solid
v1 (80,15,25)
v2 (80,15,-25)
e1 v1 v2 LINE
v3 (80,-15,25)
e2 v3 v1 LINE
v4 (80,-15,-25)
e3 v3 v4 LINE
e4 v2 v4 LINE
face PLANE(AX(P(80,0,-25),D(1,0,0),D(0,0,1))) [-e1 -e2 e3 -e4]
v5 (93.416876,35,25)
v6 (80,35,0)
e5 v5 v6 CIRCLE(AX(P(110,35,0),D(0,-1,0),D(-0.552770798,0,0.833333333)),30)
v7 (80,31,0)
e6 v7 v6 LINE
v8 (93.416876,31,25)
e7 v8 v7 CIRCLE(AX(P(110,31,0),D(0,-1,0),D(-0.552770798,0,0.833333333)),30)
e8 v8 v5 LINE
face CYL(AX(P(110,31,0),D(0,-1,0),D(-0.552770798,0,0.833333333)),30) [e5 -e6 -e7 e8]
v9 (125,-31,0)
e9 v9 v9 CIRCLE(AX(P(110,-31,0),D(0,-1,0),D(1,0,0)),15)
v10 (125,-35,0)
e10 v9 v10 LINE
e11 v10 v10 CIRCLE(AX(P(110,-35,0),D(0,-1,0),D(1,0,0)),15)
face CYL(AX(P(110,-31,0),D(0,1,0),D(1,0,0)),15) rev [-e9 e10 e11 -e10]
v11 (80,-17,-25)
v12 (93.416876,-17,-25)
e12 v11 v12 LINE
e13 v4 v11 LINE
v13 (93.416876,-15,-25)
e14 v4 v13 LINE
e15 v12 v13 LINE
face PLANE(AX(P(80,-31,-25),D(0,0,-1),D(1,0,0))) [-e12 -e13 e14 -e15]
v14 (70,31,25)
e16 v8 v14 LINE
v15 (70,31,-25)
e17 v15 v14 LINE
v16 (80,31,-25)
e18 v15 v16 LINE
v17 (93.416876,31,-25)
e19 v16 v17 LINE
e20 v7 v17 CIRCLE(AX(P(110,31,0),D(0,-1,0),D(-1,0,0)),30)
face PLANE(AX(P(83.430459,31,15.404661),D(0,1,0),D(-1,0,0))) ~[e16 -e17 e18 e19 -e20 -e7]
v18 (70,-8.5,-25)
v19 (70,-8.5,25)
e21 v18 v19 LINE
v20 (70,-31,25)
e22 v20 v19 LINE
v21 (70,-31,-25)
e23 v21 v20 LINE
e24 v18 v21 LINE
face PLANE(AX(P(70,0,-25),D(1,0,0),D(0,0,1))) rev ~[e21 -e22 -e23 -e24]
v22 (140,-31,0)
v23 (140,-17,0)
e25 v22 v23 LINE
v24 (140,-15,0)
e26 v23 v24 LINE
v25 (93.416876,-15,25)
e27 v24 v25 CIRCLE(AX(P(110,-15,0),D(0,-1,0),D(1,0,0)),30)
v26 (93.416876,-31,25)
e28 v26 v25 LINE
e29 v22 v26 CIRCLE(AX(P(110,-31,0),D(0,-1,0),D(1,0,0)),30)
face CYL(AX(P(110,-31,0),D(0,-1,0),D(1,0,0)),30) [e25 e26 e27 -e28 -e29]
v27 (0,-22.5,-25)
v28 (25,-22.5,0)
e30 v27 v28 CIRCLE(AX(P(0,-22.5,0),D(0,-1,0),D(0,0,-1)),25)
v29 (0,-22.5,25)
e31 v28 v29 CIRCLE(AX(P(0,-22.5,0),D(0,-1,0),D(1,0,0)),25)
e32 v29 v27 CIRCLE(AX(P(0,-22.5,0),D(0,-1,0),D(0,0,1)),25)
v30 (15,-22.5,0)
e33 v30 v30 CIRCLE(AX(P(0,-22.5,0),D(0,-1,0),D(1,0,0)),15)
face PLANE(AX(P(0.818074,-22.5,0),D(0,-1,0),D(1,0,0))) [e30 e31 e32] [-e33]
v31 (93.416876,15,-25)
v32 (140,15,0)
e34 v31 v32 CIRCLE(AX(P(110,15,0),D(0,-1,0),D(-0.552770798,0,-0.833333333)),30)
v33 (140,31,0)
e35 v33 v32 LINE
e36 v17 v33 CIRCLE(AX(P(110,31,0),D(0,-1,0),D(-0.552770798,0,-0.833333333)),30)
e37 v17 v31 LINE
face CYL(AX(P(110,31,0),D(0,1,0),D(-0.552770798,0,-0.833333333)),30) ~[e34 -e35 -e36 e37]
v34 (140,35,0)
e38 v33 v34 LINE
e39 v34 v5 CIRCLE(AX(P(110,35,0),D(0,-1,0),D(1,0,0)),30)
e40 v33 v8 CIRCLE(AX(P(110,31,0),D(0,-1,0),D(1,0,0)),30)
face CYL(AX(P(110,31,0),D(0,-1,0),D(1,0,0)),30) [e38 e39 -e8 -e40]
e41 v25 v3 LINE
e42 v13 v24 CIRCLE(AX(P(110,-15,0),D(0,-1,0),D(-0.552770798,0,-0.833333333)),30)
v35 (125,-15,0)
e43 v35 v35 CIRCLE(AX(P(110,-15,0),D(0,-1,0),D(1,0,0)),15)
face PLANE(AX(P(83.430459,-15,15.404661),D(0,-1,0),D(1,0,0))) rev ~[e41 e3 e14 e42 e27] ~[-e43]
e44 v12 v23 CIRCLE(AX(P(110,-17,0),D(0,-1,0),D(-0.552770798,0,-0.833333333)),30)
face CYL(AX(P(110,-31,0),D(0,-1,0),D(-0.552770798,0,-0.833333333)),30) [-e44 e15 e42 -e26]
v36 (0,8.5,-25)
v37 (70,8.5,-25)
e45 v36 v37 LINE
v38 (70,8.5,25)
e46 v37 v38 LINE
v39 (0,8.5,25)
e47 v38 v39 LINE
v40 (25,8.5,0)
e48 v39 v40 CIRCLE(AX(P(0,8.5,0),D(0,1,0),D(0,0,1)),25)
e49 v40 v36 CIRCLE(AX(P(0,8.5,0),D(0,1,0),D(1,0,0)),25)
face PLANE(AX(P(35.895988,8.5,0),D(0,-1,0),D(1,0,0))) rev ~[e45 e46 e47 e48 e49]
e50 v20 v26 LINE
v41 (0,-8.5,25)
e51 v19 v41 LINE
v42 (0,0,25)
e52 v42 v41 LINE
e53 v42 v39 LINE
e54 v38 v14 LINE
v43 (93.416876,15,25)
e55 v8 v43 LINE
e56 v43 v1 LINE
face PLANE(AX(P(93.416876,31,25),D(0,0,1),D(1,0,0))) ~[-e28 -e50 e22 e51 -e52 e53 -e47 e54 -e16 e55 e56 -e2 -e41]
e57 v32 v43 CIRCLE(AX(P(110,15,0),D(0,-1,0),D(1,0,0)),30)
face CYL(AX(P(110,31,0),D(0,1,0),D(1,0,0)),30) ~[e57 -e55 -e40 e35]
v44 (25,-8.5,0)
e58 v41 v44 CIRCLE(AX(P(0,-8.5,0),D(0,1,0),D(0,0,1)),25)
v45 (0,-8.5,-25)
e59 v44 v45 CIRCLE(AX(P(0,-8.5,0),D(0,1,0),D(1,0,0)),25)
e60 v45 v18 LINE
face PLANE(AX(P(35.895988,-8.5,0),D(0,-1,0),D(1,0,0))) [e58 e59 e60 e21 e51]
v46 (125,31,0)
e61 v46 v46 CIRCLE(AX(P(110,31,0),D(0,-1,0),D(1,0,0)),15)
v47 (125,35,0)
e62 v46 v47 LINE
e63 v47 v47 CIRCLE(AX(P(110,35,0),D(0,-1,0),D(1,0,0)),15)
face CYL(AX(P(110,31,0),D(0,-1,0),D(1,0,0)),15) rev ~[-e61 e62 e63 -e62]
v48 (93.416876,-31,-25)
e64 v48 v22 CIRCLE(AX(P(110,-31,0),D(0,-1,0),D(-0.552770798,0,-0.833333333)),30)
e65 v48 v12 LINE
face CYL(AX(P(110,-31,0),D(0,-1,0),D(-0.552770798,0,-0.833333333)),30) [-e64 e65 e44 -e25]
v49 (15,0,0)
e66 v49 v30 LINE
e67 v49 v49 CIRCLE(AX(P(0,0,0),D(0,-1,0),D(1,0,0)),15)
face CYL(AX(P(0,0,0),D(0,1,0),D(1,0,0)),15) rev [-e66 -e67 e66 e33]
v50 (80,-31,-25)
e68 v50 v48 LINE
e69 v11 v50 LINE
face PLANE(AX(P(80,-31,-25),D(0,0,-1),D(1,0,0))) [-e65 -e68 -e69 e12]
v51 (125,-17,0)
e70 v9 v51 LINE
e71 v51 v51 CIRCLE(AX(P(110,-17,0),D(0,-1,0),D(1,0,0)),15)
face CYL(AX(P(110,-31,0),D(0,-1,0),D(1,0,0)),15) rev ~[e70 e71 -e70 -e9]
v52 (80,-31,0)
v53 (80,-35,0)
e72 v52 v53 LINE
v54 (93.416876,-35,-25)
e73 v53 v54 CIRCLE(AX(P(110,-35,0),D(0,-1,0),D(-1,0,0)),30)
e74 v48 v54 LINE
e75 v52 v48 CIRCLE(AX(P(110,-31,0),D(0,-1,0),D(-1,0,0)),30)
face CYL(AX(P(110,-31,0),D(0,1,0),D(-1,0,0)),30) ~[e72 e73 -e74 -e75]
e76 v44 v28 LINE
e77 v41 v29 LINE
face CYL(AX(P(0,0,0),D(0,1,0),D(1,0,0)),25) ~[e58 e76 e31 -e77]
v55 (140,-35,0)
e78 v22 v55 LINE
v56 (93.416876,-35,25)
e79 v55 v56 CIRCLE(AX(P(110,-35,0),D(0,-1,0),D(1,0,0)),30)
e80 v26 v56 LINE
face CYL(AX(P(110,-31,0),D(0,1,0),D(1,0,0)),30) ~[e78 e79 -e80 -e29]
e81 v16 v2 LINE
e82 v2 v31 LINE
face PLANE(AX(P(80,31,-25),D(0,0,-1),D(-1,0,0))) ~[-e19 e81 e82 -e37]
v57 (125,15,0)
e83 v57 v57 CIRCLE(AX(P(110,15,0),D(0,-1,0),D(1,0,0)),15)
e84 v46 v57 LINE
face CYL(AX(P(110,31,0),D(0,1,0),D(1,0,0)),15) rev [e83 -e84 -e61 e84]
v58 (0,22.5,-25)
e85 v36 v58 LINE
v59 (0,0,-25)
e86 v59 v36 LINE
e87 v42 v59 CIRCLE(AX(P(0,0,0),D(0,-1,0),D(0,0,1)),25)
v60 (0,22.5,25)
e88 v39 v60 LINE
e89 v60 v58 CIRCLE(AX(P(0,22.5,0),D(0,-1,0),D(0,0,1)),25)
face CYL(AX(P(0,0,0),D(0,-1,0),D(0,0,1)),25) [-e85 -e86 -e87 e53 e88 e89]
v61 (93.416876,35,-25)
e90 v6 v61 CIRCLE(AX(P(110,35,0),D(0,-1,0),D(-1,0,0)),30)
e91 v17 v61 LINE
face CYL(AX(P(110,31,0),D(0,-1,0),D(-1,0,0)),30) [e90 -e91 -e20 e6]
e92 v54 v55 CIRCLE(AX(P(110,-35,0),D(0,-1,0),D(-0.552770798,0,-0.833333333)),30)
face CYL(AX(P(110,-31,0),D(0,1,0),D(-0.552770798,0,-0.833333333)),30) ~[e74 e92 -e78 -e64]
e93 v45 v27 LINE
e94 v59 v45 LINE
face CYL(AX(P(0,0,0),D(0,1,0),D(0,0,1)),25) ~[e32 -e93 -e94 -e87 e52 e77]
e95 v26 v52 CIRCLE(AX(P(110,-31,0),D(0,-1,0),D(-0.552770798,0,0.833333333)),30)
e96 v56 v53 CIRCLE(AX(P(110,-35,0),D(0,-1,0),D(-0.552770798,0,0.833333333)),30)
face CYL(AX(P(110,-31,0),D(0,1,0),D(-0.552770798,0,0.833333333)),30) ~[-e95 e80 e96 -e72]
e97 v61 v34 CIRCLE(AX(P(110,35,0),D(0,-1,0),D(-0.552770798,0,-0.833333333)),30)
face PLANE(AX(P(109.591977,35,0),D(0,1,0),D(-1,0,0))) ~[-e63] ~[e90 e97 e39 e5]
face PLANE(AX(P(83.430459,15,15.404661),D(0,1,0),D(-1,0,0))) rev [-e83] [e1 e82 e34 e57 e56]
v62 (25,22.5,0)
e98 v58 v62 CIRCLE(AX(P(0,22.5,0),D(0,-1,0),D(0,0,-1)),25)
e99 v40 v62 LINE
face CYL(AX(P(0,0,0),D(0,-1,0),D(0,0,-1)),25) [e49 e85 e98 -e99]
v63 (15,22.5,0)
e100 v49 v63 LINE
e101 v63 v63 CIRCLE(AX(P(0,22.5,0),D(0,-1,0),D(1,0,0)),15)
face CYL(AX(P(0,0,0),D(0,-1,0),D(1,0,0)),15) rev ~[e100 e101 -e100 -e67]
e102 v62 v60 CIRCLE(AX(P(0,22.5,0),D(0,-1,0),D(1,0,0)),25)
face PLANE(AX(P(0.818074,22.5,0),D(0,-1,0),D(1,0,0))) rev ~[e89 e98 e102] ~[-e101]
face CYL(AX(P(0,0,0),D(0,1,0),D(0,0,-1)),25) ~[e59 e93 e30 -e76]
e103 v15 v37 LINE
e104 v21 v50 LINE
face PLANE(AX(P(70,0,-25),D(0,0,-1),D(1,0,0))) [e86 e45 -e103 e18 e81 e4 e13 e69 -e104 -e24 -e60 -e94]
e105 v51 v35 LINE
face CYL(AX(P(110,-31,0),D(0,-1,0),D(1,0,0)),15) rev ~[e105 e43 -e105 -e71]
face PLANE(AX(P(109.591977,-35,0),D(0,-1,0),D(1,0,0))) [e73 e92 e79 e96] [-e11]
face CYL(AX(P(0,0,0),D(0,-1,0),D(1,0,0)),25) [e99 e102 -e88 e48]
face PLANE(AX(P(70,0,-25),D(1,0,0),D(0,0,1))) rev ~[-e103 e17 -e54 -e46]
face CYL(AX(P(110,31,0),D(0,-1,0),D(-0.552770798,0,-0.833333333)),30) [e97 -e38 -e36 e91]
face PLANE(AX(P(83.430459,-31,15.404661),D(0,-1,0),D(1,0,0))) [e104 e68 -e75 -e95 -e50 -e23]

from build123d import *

# Parameters (mm, degrees)
F0_R      = 15
F1_DEPTH  = 22.5
F2_DEPTH  = 8.5
F5_W      = 10
F5_H      = 50
F6_DEPTH  = 31
F8_R      = 15
F9_DEPTH  = 16
F10_DEPTH = 14
F12_DEPTH = 4


# Not quite as in the source:
# - a pattern or mirror of a feature is missing from the dataset's text; its kind, count and spacing are read off the source's solid


with BuildPart() as f1:
    # F0 (on Front) → F1 (new body, symmetric)
    with BuildSketch(Plane.XZ):
        with BuildLine():
            ThreePointArc((0, -25), (17.6776695297, -17.6776695297), (25, 0))
            ThreePointArc((25, 0), (17.6776695297, 17.6776695297), (0, 25))
            ThreePointArc((0, 25), (-25, 0), (0, -25))
        make_face()
        Circle(F0_R, mode=Mode.SUBTRACT)
    extrude(amount=F1_DEPTH, both=True)

    # F0 (on Front) → F2 (join, symmetric)
    with BuildSketch(Plane.XZ):
        with BuildLine():
            ThreePointArc((0, 25), (17.6776695297, 17.6776695297), (25, 0))
            ThreePointArc((25, 0), (17.6776695297, -17.6776695297), (0, -25))
            Line((0, -25), (70, -25))
            Line((70, -25), (70, 25))
            Line((70, 25), (0, 25))
        make_face()
    extrude(amount=F2_DEPTH, both=True)

    # F5 (on Front) → F6 (join, symmetric)
    with BuildSketch(Plane.XZ):
        with Locations((75, 0)):
            Rectangle(F5_W, F5_H)
    extrude(amount=F6_DEPTH, both=True)

    # F8 (on face) → F9 (join)
    with BuildSketch(Plane.XZ.offset(31)):
        with BuildLine():
            Line((93.4168760482, 25), (80, 25))
            Line((80, 25), (80, 0))
            ThreePointArc((80, 0), (83.5661796315, 14.1863716546), (93.4168760482, 25))
        make_face()
        with BuildLine():
            ThreePointArc((93.4168760482, 25), (83.5661796315, 14.1863716546), (80, 0))
            ThreePointArc((80, 0), (83.5661796315, -14.1863716546), (93.4168760482, -25))
            ThreePointArc((93.4168760482, -25), (124.1863716546, -26.4338203685), (140, 0))
            ThreePointArc((140, 0), (124.1863716546, 26.4338203685), (93.4168760482, 25))
        make_face()
        with Locations((110, 0)):
            Circle(F8_R, mode=Mode.SUBTRACT)
        with BuildLine():
            ThreePointArc((93.4168760482, -25), (83.5661796315, -14.1863716546), (80, 0))
            Line((80, 0), (80, -25))
            Line((80, -25), (93.4168760482, -25))
        make_face()
    f9 = extrude(amount=-F9_DEPTH)

    # F9_copies: F9 across plane
    add(f9.mirror(Plane.ZX))

    # F8 (on face) → F10 (join)
    with BuildSketch(Plane.XZ.offset(31)):
        with BuildLine():
            Line((93.4168760482, 25), (80, 25))
            Line((80, 25), (80, 0))
            ThreePointArc((80, 0), (83.5661796315, 14.1863716546), (93.4168760482, 25))
        make_face()
        with BuildLine():
            ThreePointArc((93.4168760482, -25), (83.5661796315, -14.1863716546), (80, 0))
            Line((80, 0), (80, -25))
            Line((80, -25), (93.4168760482, -25))
        make_face()
        with BuildLine():
            ThreePointArc((93.4168760482, 25), (83.5661796315, 14.1863716546), (80, 0))
            ThreePointArc((80, 0), (83.5661796315, -14.1863716546), (93.4168760482, -25))
            ThreePointArc((93.4168760482, -25), (124.1863716546, -26.4338203685), (140, 0))
            ThreePointArc((140, 0), (124.1863716546, 26.4338203685), (93.4168760482, 25))
        make_face()
        with Locations((110, 0)):
            Circle(F8_R, mode=Mode.SUBTRACT)
    extrude(amount=-F10_DEPTH)

    # F8 (on face) → F12 (join)
    with BuildSketch(Plane.XZ.offset(31)):
        with BuildLine():
            ThreePointArc((93.4168760482, 25), (83.5661796315, 14.1863716546), (80, 0))
            ThreePointArc((80, 0), (83.5661796315, -14.1863716546), (93.4168760482, -25))
            ThreePointArc((93.4168760482, -25), (124.1863716546, -26.4338203685), (140, 0))
            ThreePointArc((140, 0), (124.1863716546, 26.4338203685), (93.4168760482, 25))
        make_face()
        with Locations((110, 0)):
            Circle(F8_R, mode=Mode.SUBTRACT)
    f12 = extrude(amount=F12_DEPTH)

    # F12_copies: F12 across plane
    add(f12.mirror(Plane.ZX))


solid = f1.part
